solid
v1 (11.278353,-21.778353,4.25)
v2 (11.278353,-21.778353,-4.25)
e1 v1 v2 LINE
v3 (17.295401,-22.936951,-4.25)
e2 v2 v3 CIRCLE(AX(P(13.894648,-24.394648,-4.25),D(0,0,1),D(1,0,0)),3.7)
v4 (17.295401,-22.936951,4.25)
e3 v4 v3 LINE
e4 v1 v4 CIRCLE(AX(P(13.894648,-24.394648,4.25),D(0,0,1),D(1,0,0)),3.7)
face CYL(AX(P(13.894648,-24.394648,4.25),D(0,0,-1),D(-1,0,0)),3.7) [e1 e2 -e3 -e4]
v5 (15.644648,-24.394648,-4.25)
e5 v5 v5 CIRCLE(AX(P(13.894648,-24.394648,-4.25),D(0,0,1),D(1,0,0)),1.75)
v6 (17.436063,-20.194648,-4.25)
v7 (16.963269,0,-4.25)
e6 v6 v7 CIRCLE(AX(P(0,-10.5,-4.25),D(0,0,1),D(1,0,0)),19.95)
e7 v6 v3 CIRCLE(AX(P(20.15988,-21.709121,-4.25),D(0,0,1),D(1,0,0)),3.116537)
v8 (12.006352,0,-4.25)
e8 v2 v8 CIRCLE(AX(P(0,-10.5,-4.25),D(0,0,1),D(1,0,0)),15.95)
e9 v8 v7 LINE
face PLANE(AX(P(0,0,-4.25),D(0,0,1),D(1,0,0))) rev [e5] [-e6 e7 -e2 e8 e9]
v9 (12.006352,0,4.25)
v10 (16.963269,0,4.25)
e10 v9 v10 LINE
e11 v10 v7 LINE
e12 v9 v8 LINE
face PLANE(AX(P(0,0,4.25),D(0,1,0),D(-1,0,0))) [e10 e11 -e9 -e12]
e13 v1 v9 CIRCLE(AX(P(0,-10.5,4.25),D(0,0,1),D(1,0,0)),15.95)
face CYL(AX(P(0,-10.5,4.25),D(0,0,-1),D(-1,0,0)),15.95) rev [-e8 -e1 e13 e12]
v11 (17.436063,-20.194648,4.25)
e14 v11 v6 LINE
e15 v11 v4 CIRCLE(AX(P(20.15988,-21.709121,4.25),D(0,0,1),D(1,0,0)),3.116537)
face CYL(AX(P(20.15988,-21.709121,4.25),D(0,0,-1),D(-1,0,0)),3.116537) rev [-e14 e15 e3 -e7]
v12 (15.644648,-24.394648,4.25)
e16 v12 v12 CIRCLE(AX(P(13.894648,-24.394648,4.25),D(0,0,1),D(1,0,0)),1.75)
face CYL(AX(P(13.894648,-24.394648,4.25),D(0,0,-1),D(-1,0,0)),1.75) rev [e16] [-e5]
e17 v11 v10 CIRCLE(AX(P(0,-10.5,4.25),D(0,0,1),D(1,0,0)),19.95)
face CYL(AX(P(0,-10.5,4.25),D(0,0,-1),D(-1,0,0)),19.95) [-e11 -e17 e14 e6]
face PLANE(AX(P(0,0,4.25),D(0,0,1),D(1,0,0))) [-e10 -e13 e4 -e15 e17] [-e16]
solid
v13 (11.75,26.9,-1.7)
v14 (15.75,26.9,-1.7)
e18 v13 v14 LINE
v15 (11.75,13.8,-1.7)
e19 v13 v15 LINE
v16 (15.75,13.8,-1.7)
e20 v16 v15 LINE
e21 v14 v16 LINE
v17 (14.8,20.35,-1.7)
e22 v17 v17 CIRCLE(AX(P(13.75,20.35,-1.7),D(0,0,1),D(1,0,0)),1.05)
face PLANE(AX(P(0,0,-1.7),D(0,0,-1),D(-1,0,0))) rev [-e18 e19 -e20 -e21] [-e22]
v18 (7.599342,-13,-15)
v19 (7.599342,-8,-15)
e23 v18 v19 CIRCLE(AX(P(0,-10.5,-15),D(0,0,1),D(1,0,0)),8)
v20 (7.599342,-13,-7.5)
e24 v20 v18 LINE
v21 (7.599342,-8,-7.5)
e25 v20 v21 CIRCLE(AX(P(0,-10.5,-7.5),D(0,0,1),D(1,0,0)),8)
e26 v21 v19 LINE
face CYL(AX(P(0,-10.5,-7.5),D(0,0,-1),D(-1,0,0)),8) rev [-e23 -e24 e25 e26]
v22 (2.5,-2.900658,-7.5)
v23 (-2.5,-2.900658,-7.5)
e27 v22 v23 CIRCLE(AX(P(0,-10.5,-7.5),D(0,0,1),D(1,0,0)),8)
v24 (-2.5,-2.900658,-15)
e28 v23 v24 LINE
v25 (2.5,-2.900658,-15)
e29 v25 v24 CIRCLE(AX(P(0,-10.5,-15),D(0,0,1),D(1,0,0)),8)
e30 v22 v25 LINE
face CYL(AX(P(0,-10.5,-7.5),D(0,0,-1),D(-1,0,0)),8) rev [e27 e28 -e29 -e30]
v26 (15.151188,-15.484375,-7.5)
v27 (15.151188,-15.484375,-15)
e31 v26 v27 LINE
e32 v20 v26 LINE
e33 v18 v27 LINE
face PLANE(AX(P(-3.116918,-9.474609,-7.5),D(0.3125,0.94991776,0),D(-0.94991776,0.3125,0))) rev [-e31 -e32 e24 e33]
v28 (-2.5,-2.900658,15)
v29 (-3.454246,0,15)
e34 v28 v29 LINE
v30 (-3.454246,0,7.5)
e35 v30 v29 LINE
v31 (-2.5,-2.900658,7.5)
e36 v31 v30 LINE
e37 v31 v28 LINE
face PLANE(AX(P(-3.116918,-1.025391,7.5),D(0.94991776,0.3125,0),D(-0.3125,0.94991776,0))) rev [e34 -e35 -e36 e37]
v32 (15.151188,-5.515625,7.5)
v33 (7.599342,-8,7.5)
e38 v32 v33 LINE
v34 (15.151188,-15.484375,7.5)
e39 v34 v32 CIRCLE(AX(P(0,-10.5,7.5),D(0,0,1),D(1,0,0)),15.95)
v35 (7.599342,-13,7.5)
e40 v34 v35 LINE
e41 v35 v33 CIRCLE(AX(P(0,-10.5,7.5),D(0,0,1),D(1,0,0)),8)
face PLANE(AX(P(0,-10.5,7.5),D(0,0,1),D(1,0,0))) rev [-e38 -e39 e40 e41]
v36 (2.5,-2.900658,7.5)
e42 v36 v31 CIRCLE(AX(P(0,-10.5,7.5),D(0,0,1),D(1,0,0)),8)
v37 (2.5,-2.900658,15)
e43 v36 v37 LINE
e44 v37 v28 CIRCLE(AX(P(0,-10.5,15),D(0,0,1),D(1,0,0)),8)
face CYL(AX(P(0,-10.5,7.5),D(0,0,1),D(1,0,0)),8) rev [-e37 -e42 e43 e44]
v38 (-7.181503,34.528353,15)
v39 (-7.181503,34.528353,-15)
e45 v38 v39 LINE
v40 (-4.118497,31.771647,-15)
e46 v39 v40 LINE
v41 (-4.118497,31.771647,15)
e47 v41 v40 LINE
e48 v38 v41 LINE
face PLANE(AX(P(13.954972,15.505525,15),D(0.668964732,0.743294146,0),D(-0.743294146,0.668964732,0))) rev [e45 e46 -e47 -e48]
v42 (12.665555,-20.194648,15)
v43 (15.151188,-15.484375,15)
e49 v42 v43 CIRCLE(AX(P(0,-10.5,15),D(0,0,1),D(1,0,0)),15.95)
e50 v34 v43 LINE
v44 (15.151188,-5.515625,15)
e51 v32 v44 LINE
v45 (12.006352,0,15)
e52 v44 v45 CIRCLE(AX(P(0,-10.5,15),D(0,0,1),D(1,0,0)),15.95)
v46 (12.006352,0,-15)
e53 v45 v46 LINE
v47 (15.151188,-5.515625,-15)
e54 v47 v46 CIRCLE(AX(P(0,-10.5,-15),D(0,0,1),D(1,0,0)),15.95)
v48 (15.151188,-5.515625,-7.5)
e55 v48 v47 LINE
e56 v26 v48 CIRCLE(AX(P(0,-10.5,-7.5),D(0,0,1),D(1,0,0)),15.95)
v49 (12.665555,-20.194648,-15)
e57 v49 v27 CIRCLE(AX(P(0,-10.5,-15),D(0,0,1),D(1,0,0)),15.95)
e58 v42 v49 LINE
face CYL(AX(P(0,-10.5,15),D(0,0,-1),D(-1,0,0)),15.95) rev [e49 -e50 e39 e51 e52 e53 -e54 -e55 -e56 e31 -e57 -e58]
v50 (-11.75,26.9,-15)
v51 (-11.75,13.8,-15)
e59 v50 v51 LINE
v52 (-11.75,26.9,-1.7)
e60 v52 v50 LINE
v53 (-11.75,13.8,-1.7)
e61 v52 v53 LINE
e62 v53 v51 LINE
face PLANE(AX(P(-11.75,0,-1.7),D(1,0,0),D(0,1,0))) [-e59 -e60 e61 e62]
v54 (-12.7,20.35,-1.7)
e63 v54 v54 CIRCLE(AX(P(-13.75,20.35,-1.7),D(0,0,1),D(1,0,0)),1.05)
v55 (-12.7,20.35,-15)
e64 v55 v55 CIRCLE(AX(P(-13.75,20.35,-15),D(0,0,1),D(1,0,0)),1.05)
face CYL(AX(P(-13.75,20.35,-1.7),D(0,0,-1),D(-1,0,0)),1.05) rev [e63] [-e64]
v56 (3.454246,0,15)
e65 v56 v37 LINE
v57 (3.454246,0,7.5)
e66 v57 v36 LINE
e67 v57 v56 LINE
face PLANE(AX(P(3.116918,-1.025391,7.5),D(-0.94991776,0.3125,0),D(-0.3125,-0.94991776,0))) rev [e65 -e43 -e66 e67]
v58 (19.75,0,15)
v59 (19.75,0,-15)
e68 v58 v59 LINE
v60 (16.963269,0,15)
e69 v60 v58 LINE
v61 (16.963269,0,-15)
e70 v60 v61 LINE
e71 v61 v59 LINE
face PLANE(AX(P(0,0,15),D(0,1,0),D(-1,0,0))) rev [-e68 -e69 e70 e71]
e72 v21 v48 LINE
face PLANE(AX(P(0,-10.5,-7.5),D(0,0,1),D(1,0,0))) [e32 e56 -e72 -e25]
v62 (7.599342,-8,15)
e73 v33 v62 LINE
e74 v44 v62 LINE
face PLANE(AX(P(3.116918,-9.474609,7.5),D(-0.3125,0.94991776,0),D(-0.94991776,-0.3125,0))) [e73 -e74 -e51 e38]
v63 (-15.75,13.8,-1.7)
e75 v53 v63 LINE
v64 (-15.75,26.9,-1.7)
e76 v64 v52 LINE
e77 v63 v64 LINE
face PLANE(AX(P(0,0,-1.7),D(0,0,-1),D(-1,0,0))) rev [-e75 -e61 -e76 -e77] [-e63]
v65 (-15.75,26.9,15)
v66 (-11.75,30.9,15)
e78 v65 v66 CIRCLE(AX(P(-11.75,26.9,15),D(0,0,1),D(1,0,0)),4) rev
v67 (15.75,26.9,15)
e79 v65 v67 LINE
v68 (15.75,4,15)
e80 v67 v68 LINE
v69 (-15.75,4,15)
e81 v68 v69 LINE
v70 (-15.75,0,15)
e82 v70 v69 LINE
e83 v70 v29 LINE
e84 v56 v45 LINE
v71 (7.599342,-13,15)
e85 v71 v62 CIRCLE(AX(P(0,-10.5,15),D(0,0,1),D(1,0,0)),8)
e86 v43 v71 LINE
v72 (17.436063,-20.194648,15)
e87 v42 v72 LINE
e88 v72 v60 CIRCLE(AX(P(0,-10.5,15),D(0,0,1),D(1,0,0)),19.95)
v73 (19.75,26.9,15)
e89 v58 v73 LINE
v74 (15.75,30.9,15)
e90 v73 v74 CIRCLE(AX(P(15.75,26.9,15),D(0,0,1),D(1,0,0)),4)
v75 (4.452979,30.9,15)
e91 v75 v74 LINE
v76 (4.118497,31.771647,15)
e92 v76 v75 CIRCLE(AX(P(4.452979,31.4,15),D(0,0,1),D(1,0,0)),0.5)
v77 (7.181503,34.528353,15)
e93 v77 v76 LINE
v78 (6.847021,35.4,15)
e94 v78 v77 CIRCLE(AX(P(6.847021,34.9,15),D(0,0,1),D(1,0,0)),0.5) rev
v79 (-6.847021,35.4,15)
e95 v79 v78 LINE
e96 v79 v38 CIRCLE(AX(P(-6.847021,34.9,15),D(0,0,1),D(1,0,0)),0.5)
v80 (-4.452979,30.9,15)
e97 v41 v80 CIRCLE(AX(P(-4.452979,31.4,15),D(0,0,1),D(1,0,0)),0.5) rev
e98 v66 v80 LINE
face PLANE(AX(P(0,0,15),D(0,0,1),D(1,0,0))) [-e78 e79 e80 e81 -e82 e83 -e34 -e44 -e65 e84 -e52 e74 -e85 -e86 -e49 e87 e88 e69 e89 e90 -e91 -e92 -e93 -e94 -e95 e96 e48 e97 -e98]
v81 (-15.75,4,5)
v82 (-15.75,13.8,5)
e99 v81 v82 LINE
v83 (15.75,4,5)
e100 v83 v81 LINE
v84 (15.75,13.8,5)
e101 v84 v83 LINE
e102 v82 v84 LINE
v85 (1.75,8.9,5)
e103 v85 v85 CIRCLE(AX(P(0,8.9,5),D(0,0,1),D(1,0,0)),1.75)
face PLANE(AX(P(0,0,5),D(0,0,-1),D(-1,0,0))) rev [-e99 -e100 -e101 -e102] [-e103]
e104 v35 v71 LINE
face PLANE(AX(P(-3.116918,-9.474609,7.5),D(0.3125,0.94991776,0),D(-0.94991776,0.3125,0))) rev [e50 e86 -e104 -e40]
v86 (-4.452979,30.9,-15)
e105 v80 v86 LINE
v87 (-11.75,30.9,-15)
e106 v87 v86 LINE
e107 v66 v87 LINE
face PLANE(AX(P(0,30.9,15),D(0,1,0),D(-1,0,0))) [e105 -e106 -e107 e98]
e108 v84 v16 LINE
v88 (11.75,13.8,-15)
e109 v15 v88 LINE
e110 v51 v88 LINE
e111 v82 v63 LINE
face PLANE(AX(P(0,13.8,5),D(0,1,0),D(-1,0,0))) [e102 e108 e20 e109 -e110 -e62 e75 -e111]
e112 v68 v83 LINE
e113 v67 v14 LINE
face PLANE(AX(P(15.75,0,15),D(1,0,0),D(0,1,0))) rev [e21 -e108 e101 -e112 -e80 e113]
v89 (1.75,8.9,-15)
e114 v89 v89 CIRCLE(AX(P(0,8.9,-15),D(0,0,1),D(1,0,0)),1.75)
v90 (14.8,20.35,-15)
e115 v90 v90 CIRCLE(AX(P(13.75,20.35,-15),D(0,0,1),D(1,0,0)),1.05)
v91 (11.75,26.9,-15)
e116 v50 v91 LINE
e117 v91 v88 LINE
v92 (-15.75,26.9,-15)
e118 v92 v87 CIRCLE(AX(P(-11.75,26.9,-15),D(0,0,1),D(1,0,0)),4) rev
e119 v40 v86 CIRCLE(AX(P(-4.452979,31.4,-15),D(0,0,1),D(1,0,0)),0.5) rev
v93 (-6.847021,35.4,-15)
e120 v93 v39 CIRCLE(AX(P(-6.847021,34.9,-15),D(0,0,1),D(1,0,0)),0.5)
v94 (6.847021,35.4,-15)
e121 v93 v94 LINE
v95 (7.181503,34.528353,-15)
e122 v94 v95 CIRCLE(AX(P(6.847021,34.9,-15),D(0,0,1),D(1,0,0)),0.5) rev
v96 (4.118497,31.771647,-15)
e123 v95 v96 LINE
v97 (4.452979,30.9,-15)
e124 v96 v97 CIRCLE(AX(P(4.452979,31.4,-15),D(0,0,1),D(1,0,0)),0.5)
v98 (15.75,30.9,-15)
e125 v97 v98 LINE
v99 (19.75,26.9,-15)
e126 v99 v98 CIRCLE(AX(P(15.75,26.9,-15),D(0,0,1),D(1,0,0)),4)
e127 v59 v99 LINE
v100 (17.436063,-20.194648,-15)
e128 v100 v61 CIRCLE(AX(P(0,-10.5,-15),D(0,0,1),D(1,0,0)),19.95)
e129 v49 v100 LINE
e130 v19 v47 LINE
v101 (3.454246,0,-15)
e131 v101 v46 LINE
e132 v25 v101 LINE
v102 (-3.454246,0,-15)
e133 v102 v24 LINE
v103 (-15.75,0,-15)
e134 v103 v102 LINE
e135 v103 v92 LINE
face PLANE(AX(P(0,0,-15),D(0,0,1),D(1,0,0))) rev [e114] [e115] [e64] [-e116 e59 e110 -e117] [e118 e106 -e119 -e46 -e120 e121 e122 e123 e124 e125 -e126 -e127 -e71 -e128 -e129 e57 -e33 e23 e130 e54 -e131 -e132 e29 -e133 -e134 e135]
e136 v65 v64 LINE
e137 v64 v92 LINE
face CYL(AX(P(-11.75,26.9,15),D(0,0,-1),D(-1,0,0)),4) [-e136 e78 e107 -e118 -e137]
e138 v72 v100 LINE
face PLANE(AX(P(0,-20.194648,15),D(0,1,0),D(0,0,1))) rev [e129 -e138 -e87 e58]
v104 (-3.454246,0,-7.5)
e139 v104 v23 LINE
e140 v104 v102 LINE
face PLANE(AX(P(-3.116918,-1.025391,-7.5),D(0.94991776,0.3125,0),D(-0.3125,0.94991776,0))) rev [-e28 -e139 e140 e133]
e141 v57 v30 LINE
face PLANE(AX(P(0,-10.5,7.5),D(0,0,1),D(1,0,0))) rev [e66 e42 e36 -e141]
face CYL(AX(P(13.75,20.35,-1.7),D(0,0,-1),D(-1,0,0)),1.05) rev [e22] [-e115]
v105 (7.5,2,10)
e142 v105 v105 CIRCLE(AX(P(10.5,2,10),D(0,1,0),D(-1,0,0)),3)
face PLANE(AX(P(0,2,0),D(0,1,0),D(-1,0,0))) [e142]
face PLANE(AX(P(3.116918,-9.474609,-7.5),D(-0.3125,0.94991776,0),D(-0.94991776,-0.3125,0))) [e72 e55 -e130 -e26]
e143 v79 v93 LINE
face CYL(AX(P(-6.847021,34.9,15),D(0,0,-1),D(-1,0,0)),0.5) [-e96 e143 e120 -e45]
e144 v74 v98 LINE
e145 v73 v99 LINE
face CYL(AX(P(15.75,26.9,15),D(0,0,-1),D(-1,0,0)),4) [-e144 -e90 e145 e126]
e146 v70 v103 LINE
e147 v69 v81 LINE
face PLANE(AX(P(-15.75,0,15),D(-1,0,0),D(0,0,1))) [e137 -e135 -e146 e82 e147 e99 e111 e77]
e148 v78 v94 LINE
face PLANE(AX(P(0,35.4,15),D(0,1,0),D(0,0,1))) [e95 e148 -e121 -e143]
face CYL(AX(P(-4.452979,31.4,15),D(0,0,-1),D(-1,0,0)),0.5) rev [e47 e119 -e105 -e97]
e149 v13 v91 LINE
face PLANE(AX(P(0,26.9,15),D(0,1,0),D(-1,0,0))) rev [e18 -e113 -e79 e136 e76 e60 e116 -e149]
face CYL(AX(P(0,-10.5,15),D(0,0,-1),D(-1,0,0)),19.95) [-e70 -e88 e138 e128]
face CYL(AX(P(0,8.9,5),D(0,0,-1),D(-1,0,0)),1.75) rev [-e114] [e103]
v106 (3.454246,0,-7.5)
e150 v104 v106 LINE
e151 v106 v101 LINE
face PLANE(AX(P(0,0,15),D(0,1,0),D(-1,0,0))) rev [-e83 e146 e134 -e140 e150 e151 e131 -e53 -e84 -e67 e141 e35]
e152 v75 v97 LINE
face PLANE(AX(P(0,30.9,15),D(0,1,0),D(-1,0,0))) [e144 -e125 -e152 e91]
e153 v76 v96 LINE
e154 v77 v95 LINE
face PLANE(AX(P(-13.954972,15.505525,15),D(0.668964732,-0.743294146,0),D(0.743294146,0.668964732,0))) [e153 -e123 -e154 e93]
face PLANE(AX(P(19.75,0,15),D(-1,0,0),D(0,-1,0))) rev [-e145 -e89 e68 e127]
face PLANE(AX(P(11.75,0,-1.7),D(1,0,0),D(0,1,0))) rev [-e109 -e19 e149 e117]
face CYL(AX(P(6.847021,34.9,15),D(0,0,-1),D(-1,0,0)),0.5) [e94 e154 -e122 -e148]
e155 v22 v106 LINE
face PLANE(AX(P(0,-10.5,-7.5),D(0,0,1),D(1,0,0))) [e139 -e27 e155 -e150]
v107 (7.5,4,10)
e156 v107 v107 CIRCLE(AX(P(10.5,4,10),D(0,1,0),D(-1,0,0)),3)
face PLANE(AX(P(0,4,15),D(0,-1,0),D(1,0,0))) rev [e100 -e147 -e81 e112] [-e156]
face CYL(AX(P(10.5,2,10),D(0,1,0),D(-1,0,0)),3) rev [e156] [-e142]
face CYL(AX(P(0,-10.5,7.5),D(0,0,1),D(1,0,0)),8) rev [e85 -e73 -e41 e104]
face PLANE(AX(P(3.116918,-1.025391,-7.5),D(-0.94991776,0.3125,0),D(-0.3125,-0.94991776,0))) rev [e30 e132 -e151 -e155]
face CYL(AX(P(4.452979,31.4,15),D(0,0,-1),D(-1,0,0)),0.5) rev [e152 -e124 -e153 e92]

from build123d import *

# Parameters (mm, degrees)
EXTRUDE_1_DEPTH     = 15
EXTRUDE_START       = -4.25
EXTRUDE_2_OUTLINE_R = 1.75
EXTRUDE_2_DEPTH     = 8.5
EXTRUDE_START_2     = -15
SKETCH_1_4_W        = 4
SKETCH_1_4_H        = 13.1
SKETCH_1_4_R        = 1.05
EXTRUDE_3_DEPTH     = 13.3
SKETCH_1_6_R        = 1.75
EXTRUDE_5_DEPTH     = 20
EXTRUDE_START_3     = 15
EXTRUDE_6_DEPTH     = 7.5
EXTRUDE_7_DEPTH     = 7.5
SKETCH_2_R          = 3
CUT_EXTRUDE_1_DEPTH = 2


# Read off the part's stored shape, not the designer's step: Бобышка-Вытянуть2
with BuildPart() as part:
    # Эскиз1 → Бобышка-Вытянуть1 (new, symmetric)
    with BuildSketch(Plane.XY):
        with BuildLine():
            Line((-15.75, 4), (-15.75, 0))
            Line((-15.75, 0), (12.006352485, 0))
            ThreePointArc((12.006352485, 0), (15.941509182, -9.979629936), (12.665555468, -20.19464825))
            Line((12.665555468, -20.19464825), (17.436063068, -20.19464825))
            ThreePointArc((17.436063068, -20.19464825), (19.944534806, -10.033061691), (16.963269142, 0))
            Line((16.963269142, 0), (19.75, 0))
            Line((19.75, 0), (19.75, 26.9))
            ThreePointArc((19.75, 26.9), (18.578427125, 29.728427125), (15.75, 30.9))
            Line((15.75, 30.9), (4.452979114, 30.9))
            ThreePointArc((4.452979114, 30.9), (3.986168908, 31.220868116), (4.118496748, 31.771647073))
            Line((4.118496748, 31.771647073), (7.181503252, 34.528352927))
            ThreePointArc((7.181503252, 34.528352927), (7.313831092, 35.079131884), (6.847020886, 35.4))
            Line((6.847020886, 35.4), (-6.847020886, 35.4))
            ThreePointArc((-6.847020886, 35.4), (-7.313831092, 35.079131884), (-7.181503252, 34.528352927))
            Line((-7.181503252, 34.528352927), (-4.118496748, 31.771647073))
            ThreePointArc((-4.118496748, 31.771647073), (-3.986168908, 31.220868116), (-4.452979114, 30.9))
            Line((-4.452979114, 30.9), (-11.75, 30.9))
            ThreePointArc((-11.75, 30.9), (-14.578427125, 29.728427125), (-15.75, 26.9))
            Line((-15.75, 26.9), (15.75, 26.9))
            Line((15.75, 26.9), (15.75, 4))
            Line((15.75, 4), (-15.75, 4))
        make_face()
    extrude(amount=EXTRUDE_1_DEPTH, both=True)

    # Эскиз1<4> → Бобышка-Вытянуть3 (add)
    # profile 1 of 2: a face of its own
    with BuildSketch(Plane.XY.offset(EXTRUDE_START_2)):
        with Locations((-13.75, 20.35)):
            Rectangle(SKETCH_1_4_W, SKETCH_1_4_H)
        with Locations((-13.75, 20.35)):
            Circle(SKETCH_1_4_R, mode=Mode.SUBTRACT)
    # profile 2 of 2: a face of its own
    with BuildSketch(Plane.XY.offset(EXTRUDE_START_2)):
        with Locations((13.75, 20.35)):
            Rectangle(SKETCH_1_4_W, SKETCH_1_4_H)
        with Locations((13.75, 20.35)):
            Circle(SKETCH_1_4_R, mode=Mode.SUBTRACT)
    extrude(amount=EXTRUDE_3_DEPTH)

    # Эскиз1<6> → Бобышка-Вытянуть5 (add)
    with BuildSketch(Plane.XY.offset(EXTRUDE_START_2)):
        Polygon((-11.75, 13.8), (11.75, 13.8), (15.75, 13.8), (15.75, 4), (-15.75, 4), (-15.75, 13.8), align=None)
        with Locations((0, 8.9)):
            Circle(SKETCH_1_6_R, mode=Mode.SUBTRACT)
    extrude(amount=EXTRUDE_5_DEPTH)

    # Эскиз1<7> → Бобышка-Вытянуть6 (add)
    with BuildSketch(Plane.XY.offset(EXTRUDE_START_3)):
        with BuildLine():
            Line((3.454246399, 0), (-3.454246399, 0))
            Line((-3.454246399, 0), (-2.5, -2.900657923))
            ThreePointArc((-2.5, -2.900657923), (0, -2.5), (2.5, -2.900657923))
            Line((2.5, -2.900657923), (3.454246399, 0))
        make_face()
        with BuildLine():
            ThreePointArc((15.151188266, -15.484375), (15.95, -10.5), (15.151188266, -5.515625))
            Line((15.151188266, -5.515625), (7.599342077, -8))
            ThreePointArc((7.599342077, -8), (8, -10.5), (7.599342077, -13))
            Line((7.599342077, -13), (15.151188266, -15.484375))
        make_face()
    extrude(amount=-EXTRUDE_6_DEPTH)

    # Эскиз1<8> → Бобышка-Вытянуть7 (add)
    with BuildSketch(Plane.XY.offset(EXTRUDE_START_2)):
        with BuildLine():
            Line((3.454246399, 0), (-3.454246399, 0))
            Line((-3.454246399, 0), (-2.5, -2.900657923))
            ThreePointArc((-2.5, -2.900657923), (0, -2.5), (2.5, -2.900657923))
            Line((2.5, -2.900657923), (3.454246399, 0))
        make_face()
        with BuildLine():
            ThreePointArc((15.151188266, -15.484375), (15.95, -10.5), (15.151188266, -5.515625))
            Line((15.151188266, -5.515625), (7.599342077, -8))
            ThreePointArc((7.599342077, -8), (8, -10.5), (7.599342077, -13))
            Line((7.599342077, -13), (15.151188266, -15.484375))
        make_face()
    extrude(amount=EXTRUDE_7_DEPTH)

    # Эскиз2 → Вырез-Вытянуть1 (cut)
    with BuildSketch(Plane(origin=(0, 4, 0), x_dir=(1, 0, 0), z_dir=(0, 1, 0))):
        with Locations(Location((10.5, -10, 0), (0, 0, 180))):
            Circle(SKETCH_2_R)
    extrude(amount=-CUT_EXTRUDE_1_DEPTH, mode=Mode.SUBTRACT)


with BuildPart() as body_2:
    # Бобышка-Вытянуть2 outline → Бобышка-Вытянуть2 (new body)
    with BuildSketch(Plane.XY.offset(EXTRUDE_START)):
        with BuildLine():
            ThreePointArc((11.27835316, -21.77835316), (13.195055264, -28.02790707), (17.295400741, -22.936950579))
            ThreePointArc((17.295400741, -22.936950579), (17.047434126, -21.549472802), (17.436063068, -20.19464825))
            ThreePointArc((17.436063068, -20.19464825), (19.944534806, -10.033061691), (16.963269142, 0))
            Line((16.963269142, 0), (12.006352485, 0))
            ThreePointArc((12.006352485, 0), (15.94109613, -11.032873498), (11.27835316, -21.77835316))
        make_face()
        with Locations((13.89464825, -24.39464825)):
            Circle(EXTRUDE_2_OUTLINE_R, mode=Mode.SUBTRACT)
    extrude(amount=EXTRUDE_2_DEPTH)


solid = Compound([part.part, body_2.part])
